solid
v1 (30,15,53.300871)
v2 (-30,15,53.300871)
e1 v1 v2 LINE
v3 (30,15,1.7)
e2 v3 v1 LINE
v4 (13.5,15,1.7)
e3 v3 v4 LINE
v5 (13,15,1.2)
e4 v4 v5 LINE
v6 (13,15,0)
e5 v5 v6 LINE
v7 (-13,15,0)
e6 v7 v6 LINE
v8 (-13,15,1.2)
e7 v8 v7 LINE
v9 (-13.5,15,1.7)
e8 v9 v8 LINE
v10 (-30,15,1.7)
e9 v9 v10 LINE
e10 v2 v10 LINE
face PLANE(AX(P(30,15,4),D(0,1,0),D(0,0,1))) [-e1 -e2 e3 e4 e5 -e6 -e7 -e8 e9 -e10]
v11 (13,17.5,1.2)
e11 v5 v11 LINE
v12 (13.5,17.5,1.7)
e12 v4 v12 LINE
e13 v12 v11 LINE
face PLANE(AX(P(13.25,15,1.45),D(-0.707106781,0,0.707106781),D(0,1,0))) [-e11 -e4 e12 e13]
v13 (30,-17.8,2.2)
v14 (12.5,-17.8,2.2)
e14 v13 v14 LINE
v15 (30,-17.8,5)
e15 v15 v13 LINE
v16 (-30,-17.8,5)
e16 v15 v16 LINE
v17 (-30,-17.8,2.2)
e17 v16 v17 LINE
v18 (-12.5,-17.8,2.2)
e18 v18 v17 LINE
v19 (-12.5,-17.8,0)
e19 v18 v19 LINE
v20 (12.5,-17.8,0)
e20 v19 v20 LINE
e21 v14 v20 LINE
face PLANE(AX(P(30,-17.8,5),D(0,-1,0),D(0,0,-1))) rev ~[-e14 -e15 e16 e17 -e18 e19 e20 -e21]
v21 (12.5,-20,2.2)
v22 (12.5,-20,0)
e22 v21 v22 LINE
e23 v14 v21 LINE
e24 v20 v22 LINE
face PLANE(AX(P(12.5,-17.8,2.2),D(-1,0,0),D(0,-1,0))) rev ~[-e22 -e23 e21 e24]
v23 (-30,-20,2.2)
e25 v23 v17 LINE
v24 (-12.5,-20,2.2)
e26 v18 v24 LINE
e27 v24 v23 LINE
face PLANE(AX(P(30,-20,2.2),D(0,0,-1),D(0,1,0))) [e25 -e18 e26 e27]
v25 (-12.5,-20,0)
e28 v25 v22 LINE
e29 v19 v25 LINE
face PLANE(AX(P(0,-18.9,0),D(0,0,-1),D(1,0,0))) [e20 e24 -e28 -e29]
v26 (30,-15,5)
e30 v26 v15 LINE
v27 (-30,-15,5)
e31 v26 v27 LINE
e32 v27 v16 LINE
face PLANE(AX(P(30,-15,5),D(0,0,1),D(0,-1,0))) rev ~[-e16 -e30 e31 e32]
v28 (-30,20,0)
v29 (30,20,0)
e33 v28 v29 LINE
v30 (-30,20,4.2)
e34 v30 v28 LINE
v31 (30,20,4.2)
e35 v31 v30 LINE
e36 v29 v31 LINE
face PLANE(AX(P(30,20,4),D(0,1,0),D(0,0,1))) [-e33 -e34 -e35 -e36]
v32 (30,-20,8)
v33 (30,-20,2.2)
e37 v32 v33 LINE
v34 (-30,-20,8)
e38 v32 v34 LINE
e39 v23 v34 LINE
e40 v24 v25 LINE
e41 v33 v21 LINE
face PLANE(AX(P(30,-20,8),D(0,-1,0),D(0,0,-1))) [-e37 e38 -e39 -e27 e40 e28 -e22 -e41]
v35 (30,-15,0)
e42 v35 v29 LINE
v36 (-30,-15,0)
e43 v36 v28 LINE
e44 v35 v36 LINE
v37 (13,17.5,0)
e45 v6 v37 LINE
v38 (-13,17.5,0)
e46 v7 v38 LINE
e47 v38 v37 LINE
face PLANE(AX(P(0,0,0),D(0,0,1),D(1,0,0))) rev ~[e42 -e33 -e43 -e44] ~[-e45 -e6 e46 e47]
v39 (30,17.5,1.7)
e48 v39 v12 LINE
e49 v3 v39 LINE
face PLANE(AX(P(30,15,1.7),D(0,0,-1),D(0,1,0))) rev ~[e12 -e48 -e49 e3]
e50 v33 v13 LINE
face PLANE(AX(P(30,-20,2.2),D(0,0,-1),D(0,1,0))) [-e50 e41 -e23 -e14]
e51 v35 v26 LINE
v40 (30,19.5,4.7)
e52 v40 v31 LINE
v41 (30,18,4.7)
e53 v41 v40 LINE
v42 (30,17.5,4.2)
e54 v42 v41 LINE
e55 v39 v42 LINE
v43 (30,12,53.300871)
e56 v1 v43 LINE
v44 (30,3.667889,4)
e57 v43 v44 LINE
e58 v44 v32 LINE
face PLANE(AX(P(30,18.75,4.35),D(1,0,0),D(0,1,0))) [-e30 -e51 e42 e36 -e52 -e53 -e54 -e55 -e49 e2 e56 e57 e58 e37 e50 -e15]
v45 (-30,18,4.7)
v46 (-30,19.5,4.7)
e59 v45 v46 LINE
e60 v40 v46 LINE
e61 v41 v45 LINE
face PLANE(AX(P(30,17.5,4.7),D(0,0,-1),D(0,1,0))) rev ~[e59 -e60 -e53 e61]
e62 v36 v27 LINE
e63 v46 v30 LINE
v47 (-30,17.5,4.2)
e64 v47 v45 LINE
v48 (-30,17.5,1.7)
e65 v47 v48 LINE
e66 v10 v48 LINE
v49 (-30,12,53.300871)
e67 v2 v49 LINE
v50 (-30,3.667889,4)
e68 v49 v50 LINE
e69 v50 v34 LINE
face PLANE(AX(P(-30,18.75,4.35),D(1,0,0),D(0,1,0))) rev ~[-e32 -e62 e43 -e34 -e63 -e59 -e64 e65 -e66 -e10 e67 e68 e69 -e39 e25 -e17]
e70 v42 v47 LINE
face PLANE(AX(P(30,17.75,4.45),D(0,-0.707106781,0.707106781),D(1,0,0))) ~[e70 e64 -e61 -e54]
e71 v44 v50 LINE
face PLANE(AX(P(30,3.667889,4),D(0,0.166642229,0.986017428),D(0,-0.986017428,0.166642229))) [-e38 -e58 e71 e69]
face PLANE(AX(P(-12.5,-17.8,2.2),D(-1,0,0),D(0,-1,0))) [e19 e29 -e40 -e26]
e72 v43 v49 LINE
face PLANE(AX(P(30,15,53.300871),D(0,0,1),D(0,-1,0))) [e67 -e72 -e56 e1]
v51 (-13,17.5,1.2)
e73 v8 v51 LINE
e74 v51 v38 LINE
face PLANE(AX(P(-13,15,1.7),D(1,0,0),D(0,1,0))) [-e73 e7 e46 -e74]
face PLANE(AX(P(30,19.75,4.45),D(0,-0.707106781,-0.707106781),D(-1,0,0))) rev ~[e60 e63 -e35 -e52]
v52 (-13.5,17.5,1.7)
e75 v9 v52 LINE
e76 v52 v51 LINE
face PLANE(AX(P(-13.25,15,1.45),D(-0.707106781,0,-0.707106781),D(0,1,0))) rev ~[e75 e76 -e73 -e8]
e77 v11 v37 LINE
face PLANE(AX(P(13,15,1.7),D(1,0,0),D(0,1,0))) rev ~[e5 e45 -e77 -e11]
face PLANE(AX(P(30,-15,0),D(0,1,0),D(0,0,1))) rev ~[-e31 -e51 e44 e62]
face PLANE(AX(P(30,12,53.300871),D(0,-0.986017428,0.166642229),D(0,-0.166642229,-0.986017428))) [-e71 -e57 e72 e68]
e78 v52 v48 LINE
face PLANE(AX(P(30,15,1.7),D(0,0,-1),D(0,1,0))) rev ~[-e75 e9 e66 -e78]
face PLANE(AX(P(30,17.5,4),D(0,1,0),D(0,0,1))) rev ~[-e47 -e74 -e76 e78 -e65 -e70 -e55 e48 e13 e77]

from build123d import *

# Parameters (mm, degrees)
F0_W      = 60
F0_H      = 40
F1_DEPTH  = 4
F3_DEPTH  = 60
F4_W      = 2.2
F4_H      = 2.2
F4_W_2    = 2.5
F4_H_2    = 2.3
F5_DEPTH  = 60
F4_H_3    = 0.7
F6_DEPTH  = 60
F7_W      = 25
F7_H      = 2.2
F8_DEPTH  = 2.2
F9_W      = 26
F9_H      = 2.5
F10_DEPTH = 1.7
F11_SIZE  = 0.5


with BuildPart() as f1:
    # F0 (on Top) → F1 (new body)
    with BuildSketch(Plane.XY):
        Rectangle(F0_W, F0_H)
    extrude(amount=F1_DEPTH)

    # F2 (on face) → F3 (join, through all)
    with BuildSketch(Plane.YZ.offset(30)):
        Polygon((12, 53.300871376), (3.6678885292, 4), (15, 4), (15, 53.300871376), align=None)
        Polygon((-20, 8), (-20, 4), (3.6678885292, 4), align=None)
    extrude(amount=-F3_DEPTH)

    # F4 (on face) → F5 (cut, through all)
    with BuildSketch(Plane.YZ.offset(30)):
        with Locations((-18.9, 1.1)):
            Rectangle(F4_W, F4_H)
        Polygon((-17.8, 2.2), (-17.8, 0), (-15, 0), (-15, 5), (-17.8, 5), align=None)
        with Locations((16.25, 2.85)):
            Rectangle(F4_W_2, F4_H_2)
    extrude(amount=-F5_DEPTH, mode=Mode.SUBTRACT)

    # F4 (on face) → F6 (join, through all)
    with BuildSketch(Plane.YZ.offset(30)):
        with Locations((18.75, 4.35)):
            Rectangle(F4_W_2, F4_H_3)
    extrude(amount=-F6_DEPTH)

    # F7 (on face) → F8 (join, through all)
    with BuildSketch(Plane(origin=(0, 0, 2.2), x_dir=(1, 0, 0), z_dir=(0, 0, -1))):
        with Locations((0, 18.9)):
            Rectangle(F7_W, F7_H)
    extrude(amount=F8_DEPTH)

    # F9 (on face) → F10 (cut, through all)
    with BuildSketch(Plane.XY.offset(1.7)):
        with Locations((0, 16.25)):
            Rectangle(F9_W, F9_H)
    extrude(amount=-F10_DEPTH, mode=Mode.SUBTRACT)

    # F11
    f11_edges = [f1.edges().sort_by_distance(p)[0] for p in [
        (0, 20, 4.7),
        (0, 17.5, 4.7),
        (-13, 16.25, 1.7),
        (13, 16.25, 1.7),
    ]]
    chamfer(f11_edges, length=F11_SIZE)


solid = f1.part
